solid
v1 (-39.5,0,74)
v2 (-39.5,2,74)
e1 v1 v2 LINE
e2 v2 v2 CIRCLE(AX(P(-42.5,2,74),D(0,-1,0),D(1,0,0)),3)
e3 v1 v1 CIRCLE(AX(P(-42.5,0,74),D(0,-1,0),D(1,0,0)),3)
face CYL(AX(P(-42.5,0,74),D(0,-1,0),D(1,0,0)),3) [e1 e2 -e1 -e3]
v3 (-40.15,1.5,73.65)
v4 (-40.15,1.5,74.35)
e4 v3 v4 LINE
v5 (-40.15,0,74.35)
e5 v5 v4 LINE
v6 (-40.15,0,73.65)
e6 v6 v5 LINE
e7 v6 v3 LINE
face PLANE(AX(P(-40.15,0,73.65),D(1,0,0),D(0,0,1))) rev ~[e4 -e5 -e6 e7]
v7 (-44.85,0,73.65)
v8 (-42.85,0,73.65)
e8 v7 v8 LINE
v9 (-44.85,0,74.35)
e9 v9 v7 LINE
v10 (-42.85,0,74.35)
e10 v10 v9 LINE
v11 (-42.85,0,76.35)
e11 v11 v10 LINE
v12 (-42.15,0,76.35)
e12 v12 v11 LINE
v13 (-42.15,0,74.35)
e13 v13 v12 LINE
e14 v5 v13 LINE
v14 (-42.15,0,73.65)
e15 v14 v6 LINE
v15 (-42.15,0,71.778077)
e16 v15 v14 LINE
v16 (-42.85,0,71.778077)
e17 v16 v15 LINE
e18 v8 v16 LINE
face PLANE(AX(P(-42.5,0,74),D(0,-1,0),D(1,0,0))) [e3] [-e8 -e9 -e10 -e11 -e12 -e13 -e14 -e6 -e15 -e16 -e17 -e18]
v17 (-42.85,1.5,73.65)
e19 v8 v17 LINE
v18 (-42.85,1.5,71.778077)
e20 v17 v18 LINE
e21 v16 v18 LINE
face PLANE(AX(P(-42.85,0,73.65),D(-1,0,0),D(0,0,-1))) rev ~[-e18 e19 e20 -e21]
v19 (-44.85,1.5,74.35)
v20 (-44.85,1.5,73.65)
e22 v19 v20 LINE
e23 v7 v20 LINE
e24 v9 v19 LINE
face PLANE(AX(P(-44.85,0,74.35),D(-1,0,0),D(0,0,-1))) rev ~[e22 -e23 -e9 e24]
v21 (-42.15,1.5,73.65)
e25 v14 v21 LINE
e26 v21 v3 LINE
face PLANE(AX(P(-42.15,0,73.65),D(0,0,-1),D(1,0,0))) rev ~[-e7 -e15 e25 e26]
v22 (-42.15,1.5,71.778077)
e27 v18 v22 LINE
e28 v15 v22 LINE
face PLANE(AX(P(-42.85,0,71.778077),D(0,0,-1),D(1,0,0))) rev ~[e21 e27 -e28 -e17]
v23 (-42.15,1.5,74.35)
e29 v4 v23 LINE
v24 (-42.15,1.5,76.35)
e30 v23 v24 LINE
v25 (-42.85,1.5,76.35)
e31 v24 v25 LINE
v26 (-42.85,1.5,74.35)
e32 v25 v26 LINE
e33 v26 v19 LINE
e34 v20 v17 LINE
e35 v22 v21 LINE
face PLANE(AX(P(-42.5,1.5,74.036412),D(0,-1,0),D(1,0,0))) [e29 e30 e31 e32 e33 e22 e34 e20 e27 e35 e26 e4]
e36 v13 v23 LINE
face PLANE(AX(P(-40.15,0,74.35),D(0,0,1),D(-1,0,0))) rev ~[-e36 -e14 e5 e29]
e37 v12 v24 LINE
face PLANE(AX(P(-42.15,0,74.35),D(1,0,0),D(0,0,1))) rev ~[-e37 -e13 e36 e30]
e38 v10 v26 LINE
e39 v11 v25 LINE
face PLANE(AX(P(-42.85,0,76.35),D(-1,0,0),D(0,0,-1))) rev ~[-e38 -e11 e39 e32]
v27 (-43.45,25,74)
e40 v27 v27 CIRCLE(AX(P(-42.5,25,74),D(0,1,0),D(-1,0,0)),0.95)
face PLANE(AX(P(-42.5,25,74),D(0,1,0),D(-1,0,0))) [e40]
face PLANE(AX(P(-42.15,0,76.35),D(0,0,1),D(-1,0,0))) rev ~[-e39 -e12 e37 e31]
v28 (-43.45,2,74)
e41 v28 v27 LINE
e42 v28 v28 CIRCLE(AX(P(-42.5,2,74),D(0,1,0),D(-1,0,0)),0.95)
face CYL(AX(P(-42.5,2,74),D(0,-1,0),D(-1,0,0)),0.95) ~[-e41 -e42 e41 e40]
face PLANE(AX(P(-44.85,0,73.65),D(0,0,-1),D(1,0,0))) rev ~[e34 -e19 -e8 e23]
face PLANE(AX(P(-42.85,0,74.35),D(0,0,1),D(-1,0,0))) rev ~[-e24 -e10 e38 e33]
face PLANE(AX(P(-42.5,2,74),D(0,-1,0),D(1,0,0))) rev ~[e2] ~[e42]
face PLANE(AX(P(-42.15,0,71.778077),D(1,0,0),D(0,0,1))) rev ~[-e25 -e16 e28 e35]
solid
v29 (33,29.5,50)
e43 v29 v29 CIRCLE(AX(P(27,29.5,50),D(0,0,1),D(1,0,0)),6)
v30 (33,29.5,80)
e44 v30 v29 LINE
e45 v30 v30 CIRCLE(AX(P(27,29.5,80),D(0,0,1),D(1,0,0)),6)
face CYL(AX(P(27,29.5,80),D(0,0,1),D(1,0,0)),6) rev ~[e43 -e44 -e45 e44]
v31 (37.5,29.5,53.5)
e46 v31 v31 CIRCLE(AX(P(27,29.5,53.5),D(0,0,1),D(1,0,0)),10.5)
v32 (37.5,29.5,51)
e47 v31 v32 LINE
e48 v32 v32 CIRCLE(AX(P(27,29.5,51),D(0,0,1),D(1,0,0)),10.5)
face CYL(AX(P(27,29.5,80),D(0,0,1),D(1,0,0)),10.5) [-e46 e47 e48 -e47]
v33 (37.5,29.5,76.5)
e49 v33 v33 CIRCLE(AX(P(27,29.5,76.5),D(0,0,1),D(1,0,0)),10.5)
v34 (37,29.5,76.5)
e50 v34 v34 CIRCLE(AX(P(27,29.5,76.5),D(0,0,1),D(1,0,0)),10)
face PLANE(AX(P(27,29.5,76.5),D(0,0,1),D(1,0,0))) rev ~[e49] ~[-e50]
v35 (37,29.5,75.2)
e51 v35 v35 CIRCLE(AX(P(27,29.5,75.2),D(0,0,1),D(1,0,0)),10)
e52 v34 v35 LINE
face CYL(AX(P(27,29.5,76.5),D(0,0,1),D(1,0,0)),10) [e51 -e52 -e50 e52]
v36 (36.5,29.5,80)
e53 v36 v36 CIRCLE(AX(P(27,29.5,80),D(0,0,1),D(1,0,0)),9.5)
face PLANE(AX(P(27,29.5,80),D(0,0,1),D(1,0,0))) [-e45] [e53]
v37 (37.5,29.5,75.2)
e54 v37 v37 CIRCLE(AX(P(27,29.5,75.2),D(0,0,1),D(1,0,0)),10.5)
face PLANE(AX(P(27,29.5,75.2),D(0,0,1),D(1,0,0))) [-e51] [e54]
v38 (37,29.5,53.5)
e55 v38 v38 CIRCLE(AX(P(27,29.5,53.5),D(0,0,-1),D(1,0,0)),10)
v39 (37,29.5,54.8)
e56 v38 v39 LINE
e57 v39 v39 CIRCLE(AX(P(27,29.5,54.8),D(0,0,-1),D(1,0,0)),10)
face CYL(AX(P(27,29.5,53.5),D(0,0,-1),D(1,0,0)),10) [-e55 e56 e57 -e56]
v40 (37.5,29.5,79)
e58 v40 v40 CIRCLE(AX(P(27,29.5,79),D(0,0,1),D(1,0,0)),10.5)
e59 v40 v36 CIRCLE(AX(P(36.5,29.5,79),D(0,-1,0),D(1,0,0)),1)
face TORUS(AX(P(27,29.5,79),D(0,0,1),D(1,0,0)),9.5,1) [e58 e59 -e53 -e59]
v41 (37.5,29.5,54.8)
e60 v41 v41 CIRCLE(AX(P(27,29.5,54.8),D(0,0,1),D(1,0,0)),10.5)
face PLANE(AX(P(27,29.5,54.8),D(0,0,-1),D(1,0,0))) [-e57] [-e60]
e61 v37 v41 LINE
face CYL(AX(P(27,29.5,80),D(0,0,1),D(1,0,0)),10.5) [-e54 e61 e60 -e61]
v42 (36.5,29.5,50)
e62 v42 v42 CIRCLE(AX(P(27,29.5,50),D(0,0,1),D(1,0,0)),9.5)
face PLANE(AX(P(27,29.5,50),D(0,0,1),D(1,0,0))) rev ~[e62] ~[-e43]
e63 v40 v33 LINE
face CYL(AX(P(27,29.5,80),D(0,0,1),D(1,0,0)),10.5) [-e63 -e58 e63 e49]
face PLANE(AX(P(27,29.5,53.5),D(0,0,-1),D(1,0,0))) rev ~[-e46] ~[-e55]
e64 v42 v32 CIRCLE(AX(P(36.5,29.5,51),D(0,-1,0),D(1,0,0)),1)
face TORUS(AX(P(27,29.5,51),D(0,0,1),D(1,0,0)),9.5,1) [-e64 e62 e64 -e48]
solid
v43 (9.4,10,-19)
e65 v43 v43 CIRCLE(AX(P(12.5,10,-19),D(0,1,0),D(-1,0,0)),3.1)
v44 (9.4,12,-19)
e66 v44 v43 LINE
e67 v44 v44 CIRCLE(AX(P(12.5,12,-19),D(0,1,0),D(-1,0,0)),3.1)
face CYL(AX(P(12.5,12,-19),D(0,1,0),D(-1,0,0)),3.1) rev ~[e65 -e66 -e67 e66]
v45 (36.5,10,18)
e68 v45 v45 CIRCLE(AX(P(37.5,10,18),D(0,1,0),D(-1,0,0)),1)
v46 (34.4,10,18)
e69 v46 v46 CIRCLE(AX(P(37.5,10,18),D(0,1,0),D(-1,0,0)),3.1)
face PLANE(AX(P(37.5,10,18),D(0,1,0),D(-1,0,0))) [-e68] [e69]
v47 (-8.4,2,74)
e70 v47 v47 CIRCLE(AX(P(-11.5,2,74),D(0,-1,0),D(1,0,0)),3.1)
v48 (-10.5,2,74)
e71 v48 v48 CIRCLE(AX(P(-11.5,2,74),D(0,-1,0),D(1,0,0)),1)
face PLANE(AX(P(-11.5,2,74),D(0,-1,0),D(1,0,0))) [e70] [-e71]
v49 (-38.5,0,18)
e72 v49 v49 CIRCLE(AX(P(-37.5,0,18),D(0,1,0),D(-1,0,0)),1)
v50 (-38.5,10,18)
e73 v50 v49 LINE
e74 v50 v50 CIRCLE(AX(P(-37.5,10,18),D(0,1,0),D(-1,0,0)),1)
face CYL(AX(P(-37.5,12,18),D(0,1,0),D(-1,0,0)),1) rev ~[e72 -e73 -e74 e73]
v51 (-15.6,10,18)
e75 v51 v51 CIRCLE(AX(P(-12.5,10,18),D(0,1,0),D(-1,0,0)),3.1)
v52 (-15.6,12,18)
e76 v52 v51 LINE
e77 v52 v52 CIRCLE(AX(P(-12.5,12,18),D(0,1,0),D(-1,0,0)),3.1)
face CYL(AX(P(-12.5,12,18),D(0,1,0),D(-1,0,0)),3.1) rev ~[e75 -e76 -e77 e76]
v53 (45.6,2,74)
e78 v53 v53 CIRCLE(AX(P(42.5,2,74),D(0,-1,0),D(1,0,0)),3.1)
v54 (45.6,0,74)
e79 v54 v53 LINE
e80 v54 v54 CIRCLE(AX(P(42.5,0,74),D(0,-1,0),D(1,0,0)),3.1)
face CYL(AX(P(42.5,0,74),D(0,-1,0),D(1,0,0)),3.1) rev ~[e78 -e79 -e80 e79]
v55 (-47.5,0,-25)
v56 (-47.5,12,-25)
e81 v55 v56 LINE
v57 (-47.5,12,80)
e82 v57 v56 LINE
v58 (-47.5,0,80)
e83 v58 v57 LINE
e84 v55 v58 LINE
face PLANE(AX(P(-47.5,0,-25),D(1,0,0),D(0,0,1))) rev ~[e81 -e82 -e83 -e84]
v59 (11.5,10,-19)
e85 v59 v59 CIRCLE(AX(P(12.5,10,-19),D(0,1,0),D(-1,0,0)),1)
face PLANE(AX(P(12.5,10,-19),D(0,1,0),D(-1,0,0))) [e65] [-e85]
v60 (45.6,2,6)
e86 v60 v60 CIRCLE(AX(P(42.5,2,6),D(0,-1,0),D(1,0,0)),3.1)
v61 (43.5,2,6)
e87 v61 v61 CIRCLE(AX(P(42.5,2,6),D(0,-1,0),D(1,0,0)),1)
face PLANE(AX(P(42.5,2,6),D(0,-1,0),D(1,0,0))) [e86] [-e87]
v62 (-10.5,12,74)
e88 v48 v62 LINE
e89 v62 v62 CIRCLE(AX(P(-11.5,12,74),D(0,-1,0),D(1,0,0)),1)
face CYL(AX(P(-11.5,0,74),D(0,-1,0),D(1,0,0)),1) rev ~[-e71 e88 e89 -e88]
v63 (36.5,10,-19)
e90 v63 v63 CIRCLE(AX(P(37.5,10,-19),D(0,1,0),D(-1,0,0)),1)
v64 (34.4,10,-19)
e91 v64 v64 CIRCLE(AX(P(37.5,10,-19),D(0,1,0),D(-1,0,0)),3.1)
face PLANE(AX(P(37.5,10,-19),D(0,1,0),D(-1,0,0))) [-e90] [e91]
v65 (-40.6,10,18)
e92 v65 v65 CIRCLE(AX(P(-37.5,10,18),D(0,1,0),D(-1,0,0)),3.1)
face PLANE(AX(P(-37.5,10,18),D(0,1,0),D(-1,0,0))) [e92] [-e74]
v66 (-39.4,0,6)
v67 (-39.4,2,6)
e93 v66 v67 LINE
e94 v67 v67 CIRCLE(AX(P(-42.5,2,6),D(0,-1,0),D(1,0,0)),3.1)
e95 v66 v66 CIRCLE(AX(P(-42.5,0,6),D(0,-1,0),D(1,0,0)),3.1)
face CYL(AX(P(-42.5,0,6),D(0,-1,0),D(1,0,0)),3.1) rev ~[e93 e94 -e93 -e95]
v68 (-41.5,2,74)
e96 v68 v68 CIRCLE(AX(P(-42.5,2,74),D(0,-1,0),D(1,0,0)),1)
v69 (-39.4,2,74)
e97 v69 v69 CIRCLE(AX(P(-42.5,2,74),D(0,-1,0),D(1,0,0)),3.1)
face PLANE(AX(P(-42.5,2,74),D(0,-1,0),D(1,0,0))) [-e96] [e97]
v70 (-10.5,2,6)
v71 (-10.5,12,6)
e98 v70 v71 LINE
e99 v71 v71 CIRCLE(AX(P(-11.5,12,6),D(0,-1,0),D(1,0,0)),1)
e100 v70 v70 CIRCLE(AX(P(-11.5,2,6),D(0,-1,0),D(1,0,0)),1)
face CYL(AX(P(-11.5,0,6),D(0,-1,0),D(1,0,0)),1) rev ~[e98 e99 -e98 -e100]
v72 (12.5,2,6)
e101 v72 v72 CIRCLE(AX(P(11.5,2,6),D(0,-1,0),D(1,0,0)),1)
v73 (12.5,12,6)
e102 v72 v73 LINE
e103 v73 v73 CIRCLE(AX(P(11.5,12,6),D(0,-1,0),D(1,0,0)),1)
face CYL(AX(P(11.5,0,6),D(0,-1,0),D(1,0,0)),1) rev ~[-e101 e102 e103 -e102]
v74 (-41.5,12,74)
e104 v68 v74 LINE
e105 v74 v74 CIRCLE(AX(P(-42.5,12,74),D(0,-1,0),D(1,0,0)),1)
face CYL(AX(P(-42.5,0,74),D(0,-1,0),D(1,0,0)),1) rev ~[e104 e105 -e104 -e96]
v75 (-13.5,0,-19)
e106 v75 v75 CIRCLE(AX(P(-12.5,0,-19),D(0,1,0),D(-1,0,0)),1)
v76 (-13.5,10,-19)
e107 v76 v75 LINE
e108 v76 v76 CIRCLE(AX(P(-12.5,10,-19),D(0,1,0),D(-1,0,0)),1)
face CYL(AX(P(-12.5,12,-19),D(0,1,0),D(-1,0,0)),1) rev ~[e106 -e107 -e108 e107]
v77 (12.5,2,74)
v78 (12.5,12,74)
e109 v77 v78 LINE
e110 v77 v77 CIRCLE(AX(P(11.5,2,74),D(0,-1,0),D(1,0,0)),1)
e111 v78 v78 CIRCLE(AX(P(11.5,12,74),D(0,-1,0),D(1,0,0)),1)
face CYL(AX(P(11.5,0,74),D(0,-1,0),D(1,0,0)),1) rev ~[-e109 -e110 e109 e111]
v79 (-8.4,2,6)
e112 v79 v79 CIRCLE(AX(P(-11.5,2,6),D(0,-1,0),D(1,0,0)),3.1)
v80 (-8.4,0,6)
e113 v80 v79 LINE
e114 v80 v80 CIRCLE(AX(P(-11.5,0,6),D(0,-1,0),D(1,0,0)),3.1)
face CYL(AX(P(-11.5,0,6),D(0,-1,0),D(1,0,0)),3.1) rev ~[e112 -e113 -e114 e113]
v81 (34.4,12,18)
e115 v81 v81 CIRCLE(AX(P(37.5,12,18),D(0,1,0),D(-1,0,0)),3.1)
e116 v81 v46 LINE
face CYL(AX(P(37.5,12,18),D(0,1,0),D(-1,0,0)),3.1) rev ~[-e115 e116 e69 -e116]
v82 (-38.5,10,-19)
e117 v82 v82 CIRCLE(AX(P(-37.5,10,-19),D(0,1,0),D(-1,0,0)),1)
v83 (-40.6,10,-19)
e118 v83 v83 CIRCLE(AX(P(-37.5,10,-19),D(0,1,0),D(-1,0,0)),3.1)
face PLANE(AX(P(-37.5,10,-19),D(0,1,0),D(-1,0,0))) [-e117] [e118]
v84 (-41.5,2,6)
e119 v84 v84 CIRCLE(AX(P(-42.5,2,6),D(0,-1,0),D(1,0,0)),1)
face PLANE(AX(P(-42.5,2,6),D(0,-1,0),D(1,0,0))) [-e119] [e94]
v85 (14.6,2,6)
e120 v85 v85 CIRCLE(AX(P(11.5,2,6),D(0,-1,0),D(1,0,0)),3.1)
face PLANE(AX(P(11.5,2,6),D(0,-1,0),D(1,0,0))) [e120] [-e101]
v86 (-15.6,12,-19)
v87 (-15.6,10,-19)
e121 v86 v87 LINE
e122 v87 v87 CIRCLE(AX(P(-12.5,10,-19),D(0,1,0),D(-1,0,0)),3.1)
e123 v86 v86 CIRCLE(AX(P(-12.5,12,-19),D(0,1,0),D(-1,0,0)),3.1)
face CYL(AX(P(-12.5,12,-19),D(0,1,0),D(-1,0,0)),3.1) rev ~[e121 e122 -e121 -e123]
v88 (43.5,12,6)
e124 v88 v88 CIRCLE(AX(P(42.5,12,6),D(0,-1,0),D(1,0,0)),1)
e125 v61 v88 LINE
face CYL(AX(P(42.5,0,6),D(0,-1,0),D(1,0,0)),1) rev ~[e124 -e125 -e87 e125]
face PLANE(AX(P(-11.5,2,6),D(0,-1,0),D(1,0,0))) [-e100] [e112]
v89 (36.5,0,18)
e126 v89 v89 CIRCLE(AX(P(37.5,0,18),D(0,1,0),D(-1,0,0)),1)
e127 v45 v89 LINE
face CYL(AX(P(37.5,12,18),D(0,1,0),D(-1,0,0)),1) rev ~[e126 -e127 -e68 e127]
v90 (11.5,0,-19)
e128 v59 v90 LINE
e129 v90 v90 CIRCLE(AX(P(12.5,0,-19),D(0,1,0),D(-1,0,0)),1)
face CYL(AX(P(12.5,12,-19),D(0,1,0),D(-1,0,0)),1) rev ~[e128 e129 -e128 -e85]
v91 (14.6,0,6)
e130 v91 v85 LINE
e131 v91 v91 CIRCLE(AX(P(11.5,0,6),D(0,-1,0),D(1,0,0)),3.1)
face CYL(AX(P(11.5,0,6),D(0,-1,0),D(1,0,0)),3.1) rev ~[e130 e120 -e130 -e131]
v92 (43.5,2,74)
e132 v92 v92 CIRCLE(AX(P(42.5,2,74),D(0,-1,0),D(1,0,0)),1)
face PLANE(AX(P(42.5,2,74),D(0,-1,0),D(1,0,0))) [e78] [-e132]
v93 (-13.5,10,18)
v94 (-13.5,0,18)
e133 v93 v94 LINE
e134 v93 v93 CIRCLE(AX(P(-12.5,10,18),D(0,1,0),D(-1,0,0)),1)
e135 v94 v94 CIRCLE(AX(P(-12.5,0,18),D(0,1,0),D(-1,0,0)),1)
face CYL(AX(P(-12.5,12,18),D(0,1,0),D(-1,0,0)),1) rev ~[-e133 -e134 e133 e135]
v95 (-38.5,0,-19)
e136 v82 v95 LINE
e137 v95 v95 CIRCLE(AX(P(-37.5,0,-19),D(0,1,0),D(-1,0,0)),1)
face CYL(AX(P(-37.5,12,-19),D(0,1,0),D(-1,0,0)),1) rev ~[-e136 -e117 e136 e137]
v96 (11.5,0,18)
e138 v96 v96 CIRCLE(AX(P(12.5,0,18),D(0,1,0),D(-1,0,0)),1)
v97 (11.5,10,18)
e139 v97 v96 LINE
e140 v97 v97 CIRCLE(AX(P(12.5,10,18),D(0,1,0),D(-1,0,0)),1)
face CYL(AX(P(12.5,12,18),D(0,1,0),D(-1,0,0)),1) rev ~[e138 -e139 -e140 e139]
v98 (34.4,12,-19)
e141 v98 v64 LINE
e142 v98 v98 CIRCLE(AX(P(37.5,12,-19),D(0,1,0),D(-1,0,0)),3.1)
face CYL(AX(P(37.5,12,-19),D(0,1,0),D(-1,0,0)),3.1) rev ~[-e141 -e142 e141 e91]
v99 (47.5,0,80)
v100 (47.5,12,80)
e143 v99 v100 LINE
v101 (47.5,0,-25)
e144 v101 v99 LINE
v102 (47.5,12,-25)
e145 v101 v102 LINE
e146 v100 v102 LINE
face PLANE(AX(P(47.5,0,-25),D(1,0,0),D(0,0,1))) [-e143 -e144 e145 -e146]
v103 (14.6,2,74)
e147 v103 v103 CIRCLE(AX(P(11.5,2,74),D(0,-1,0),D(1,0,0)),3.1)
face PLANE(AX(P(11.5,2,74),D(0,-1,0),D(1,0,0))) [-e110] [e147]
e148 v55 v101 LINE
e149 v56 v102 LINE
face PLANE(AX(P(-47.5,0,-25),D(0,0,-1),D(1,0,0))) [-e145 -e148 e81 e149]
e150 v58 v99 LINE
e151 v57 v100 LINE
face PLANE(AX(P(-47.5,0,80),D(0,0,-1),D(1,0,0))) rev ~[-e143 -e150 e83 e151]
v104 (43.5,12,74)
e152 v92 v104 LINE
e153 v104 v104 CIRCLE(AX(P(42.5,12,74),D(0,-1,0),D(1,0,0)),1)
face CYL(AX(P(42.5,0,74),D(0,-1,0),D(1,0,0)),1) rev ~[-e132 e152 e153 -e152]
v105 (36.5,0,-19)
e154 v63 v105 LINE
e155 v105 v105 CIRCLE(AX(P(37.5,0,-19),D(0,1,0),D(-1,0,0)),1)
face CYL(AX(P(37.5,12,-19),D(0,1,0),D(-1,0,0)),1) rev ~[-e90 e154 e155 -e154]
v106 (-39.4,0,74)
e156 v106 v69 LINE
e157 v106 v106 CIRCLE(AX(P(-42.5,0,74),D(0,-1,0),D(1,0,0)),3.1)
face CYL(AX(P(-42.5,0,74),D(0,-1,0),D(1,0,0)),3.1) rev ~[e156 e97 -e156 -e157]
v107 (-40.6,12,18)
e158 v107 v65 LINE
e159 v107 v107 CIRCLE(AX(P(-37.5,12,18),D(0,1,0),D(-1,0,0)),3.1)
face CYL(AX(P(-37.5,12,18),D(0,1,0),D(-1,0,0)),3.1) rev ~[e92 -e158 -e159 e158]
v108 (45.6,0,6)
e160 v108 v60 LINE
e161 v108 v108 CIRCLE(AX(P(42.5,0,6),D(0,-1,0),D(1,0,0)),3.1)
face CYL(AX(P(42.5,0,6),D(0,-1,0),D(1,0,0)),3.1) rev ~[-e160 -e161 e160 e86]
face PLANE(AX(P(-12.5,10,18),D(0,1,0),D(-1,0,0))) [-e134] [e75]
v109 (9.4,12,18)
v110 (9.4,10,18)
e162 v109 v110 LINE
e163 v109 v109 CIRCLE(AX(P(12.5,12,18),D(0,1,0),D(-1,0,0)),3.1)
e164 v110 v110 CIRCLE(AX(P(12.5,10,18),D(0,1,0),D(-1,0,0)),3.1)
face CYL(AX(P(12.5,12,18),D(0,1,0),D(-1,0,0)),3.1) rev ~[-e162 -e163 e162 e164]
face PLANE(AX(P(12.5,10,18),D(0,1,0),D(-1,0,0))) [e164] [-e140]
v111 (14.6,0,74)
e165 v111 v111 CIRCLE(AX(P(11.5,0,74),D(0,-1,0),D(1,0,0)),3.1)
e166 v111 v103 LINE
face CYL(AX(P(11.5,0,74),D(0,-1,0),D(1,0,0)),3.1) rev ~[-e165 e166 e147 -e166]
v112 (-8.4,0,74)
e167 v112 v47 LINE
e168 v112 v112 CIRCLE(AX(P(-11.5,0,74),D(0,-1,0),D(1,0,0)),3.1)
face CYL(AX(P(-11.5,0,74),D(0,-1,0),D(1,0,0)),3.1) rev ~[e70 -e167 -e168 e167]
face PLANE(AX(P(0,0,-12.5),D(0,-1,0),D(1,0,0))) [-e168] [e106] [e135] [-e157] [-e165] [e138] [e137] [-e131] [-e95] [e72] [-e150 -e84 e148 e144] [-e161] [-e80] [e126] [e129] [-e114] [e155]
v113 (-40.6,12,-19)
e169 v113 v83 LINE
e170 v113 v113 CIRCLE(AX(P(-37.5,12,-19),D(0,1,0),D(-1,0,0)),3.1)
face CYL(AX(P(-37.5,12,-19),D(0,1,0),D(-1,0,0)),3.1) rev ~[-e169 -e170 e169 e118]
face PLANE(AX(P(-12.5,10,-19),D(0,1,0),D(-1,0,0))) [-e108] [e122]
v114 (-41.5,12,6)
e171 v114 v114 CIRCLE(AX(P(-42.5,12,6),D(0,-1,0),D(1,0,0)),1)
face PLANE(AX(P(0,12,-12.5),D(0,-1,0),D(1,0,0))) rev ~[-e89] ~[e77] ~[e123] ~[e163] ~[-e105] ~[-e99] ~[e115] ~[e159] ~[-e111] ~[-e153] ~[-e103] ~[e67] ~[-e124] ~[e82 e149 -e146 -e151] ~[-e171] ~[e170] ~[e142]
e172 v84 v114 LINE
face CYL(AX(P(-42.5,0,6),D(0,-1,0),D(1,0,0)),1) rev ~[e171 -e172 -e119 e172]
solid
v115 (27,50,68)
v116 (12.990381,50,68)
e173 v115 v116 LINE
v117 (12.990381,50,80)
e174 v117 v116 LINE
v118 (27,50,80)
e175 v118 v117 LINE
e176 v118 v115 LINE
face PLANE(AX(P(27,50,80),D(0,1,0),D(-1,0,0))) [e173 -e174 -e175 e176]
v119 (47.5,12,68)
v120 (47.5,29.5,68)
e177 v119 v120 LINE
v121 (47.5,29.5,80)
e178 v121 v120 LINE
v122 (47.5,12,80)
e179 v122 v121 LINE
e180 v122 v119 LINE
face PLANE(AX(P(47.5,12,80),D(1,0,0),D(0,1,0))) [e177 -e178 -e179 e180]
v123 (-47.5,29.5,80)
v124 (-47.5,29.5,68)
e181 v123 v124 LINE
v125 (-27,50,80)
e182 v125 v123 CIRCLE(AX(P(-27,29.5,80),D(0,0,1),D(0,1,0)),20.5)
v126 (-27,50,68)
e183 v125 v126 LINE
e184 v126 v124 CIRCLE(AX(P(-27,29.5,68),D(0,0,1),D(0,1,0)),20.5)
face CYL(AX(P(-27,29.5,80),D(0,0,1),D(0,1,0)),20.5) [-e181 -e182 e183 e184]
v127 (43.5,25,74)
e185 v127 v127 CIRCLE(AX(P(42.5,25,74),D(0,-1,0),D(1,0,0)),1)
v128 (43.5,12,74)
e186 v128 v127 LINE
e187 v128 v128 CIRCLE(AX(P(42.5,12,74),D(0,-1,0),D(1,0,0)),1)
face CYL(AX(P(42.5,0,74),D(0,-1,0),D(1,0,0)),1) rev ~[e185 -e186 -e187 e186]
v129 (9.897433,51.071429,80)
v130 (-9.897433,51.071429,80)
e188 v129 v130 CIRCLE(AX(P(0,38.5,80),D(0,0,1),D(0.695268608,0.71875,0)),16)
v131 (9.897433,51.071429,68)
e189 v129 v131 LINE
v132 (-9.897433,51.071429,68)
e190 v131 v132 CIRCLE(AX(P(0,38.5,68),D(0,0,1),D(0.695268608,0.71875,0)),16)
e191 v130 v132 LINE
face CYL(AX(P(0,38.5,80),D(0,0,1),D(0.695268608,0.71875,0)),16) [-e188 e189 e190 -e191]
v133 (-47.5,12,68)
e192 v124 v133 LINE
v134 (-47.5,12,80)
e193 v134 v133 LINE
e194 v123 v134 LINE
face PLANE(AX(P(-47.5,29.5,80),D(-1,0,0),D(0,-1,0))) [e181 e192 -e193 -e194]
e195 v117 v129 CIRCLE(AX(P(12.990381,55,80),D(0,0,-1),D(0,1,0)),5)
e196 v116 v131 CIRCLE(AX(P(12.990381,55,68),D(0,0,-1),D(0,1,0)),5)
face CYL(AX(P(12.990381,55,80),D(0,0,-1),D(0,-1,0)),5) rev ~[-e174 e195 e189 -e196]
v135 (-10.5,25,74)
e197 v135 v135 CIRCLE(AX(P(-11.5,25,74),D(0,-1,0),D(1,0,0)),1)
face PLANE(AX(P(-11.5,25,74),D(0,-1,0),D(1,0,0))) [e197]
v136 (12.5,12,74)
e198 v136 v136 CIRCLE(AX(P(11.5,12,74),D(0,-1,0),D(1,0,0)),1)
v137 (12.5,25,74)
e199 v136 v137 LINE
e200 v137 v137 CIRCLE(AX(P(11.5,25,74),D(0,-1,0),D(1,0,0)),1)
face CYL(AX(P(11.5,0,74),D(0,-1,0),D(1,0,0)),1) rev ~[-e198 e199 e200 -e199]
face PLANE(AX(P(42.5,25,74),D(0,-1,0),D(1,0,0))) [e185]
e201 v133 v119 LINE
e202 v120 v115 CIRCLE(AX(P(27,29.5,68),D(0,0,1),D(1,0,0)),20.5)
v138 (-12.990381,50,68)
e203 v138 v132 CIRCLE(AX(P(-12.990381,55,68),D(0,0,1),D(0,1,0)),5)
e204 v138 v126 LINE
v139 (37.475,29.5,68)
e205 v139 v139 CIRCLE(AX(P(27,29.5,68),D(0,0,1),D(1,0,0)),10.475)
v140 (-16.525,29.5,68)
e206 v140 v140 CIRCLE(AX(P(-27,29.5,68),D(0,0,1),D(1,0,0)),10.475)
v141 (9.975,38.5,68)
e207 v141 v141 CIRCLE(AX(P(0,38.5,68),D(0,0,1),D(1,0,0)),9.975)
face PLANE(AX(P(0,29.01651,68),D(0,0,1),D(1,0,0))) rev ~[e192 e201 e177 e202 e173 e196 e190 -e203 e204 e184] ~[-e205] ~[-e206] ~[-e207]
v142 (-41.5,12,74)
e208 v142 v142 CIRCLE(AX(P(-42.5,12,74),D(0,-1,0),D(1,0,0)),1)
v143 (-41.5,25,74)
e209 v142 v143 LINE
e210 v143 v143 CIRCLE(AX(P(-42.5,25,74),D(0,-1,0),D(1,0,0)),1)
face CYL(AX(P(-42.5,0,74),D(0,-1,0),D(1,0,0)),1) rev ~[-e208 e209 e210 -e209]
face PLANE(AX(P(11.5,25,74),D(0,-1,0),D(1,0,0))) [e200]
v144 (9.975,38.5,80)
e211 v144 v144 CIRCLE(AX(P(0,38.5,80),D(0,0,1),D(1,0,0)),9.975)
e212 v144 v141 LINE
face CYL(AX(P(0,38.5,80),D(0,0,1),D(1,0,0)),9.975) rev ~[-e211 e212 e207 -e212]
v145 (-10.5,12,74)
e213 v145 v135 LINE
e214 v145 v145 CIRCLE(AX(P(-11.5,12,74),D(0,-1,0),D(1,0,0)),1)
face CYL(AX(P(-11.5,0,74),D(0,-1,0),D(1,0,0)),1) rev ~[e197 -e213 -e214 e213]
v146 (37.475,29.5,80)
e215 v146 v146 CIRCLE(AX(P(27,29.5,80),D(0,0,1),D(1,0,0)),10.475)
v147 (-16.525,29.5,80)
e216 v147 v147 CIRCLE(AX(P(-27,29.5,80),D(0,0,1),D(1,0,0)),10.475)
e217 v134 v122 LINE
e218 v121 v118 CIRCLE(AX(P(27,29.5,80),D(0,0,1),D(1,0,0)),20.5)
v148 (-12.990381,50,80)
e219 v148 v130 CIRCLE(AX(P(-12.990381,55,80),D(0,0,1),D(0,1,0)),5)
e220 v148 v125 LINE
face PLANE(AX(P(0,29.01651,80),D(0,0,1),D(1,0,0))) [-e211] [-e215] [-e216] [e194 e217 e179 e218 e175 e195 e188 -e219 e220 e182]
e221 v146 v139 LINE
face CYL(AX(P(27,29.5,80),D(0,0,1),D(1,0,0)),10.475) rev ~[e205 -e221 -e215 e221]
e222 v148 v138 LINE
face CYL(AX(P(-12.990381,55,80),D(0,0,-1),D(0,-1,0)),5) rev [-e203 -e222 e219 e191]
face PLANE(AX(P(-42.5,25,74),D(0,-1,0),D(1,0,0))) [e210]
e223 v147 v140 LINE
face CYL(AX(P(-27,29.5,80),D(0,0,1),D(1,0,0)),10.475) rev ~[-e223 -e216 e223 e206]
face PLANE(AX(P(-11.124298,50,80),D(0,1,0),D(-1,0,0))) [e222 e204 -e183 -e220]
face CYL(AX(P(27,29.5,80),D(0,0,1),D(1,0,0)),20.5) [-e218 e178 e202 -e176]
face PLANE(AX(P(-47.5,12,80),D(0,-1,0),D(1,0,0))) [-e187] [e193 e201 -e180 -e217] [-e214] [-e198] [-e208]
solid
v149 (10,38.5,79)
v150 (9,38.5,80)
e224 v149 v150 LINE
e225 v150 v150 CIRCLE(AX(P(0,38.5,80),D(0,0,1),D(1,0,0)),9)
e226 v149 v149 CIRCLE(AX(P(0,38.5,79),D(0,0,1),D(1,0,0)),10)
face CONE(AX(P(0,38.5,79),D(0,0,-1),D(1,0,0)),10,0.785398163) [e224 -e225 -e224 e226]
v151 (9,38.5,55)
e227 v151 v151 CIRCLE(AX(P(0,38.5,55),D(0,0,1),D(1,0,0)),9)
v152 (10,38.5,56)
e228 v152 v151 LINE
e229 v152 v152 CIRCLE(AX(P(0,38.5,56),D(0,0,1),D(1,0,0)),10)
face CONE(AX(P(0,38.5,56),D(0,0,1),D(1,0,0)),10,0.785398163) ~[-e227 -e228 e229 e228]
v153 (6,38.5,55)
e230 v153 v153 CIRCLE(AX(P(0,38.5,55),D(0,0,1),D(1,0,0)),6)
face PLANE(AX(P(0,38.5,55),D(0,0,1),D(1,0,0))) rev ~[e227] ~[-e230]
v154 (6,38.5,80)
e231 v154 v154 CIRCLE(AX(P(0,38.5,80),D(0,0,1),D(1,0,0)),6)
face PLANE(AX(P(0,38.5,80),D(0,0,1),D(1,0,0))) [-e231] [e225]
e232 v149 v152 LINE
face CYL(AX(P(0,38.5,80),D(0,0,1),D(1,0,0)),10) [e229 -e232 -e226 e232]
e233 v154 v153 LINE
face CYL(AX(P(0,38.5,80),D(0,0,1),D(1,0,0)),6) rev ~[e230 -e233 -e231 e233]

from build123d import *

# Parameters (mm, degrees)
F0_W      = 95
F0_H      = 80
F1_DEPTH  = 12
F2_R      = 10.475
F3_DEPTH  = 12
F4_R      = 9.975
F5_DEPTH  = 25
F6_R      = 10.5
F6_R_2    = 6
F7_DEPTH  = 30
F9_START  = -3.5
F8_R      = 13.9480454754
F8_R_2    = 10
F9_DEPTH  = 1.3
F11_START = -3.5
F10_R     = 14.6955703702
F10_R_2   = 10
F11_DEPTH = 1.3
F12_R     = 1
F13_R     = 1
F14_DEPTH = 25
F15_R     = 3.1
F16_DEPTH = 2
F17_R     = 3
F18_DEPTH = 2
F19_R     = 0.95
F20_DEPTH = 23
F22_DEPTH = 1.5
F23_W     = 95
F23_H     = 25
F24_DEPTH = 12
F25_R     = 1
F26_DEPTH = 25
F27_R     = 3.1
F28_DEPTH = 2
F29_R     = 10
F29_R_2   = 6
F30_DEPTH = 25
F31_SIZE  = 1
F32_R     = 5


with BuildPart() as f1:
    # F0 (on Front) → F1 (new body)
    with BuildSketch(Plane.XZ):
        with Locations((0, 40)):
            Rectangle(F0_W, F0_H)
    extrude(amount=-F1_DEPTH)


with BuildPart() as f3:
    # F2 (on face) → F3 (new body)
    with BuildSketch(Plane.XY.offset(80)):
        with BuildLine():
            Line((-47.5, 12), (47.5, 12))
            Line((47.5, 12), (47.5, 29.5))
            ThreePointArc((47.5, 29.5), (41.4956890143, 43.9956890143), (27, 50))
            Line((27, 50), (11.1242977306, 50))
            ThreePointArc((11.1242977306, 50), (14.7307291688, 44.7454477946), (16, 38.5))
            ThreePointArc((16, 38.5), (-6.2454477946, 23.7692708312), (-11.1242977306, 50))
            Line((-11.1242977306, 50), (-27, 50))
            ThreePointArc((-27, 50), (-41.4956890143, 43.9956890143), (-47.5, 29.5))
            Line((-47.5, 29.5), (-47.5, 12))
        make_face()
        with Locations((-27, 29.5)):
            Circle(F2_R, mode=Mode.SUBTRACT)
        with Locations((27, 29.5)):
            Circle(F2_R, mode=Mode.SUBTRACT)
        with BuildLine():
            ThreePointArc((16, 38.5), (14.7307291688, 44.7454477946), (11.1242977306, 50))
            Line((11.1242977306, 50), (-11.1242977306, 50))
            ThreePointArc((-11.1242977306, 50), (-6.2454477946, 23.7692708312), (16, 38.5))
        make_face()
        with BuildLine():
            Line((-11.1242977306, 50), (11.1242977306, 50))
            ThreePointArc((11.1242977306, 50), (0, 54.5), (-11.1242977306, 50))
        make_face()
    extrude(amount=-F3_DEPTH)

    # F4 (on face) → F5 (cut)
    with BuildSketch(Plane.XY.offset(80)):
        with Locations((0, 38.5)):
            Circle(F4_R)
    extrude(amount=-F5_DEPTH, mode=Mode.SUBTRACT)


with BuildPart() as f7:
    # F6 (on face) → F7 (new body)
    with BuildSketch(Plane.XY.offset(80)):
        with Locations((27, 29.5)):
            Circle(F6_R)
        with Locations((27, 29.5)):
            Circle(F6_R_2, mode=Mode.SUBTRACT)
    extrude(amount=-F7_DEPTH)

    # F8 (on face) → F9 (cut)
    with BuildSketch(Plane.XY.offset(80).offset(F9_START)):
        with Locations((27, 29.5)):
            Circle(F8_R)
        with Locations((27, 29.5)):
            Circle(F8_R_2, mode=Mode.SUBTRACT)
    extrude(amount=-F9_DEPTH, mode=Mode.SUBTRACT)

    # F10 (on face) → F11 (cut)
    with BuildSketch(Plane(origin=(0, 0, 50), x_dir=(1, 0, 0), z_dir=(0, 0, -1)).offset(F11_START)):
        with Locations((27, -29.5)):
            Circle(F10_R)
        with Locations((27, -29.5)):
            Circle(F10_R_2, mode=Mode.SUBTRACT)
    extrude(amount=-F11_DEPTH, mode=Mode.SUBTRACT)

    # F12
    f12_edges = [f7.edges().sort_by_distance(p)[0] for p in [
        (16.5, 29.5, 80),
        (16.5, 29.5, 50),
    ]]
    fillet(f12_edges, radius=F12_R)


with BuildPart() as f14_tool:
    # F13 (on face) → F14 (new body)
    with BuildSketch(Plane.XZ):
        with Locations((-42.5, 74)):
            Circle(F13_R)
        with Locations((-11.5, 74)):
            Circle(F13_R)
        with Locations((11.5, 74)):
            Circle(F13_R)
        with Locations((42.5, 74)):
            Circle(F13_R)
        with Locations((-42.5, 6)):
            Circle(F13_R)
        with Locations((-11.5, 6)):
            Circle(F13_R)
        with Locations((11.5, 6)):
            Circle(F13_R)
        with Locations((42.5, 6)):
            Circle(F13_R)
    extrude(amount=-F14_DEPTH)


with BuildPart() as f1_1:
    add(f1.part)

    # F14: cut by f14_tool
    add(f14_tool.part, mode=Mode.SUBTRACT)

    # F15 (on face) → F16 (cut)
    with BuildSketch(Plane.XZ):
        with Locations((-42.5, 74)):
            Circle(F15_R)
        with Locations((-11.5, 74)):
            Circle(F15_R)
        with Locations((11.5, 74)):
            Circle(F15_R)
        with Locations((42.5, 74)):
            Circle(F15_R)
        with Locations((-42.5, 6)):
            Circle(F15_R)
        with Locations((-11.5, 6)):
            Circle(F15_R)
        with Locations((11.5, 6)):
            Circle(F15_R)
        with Locations((42.5, 6)):
            Circle(F15_R)
    extrude(amount=-F16_DEPTH, mode=Mode.SUBTRACT)

    # F23 (on face) → F24 (join)
    with BuildSketch(Plane.XZ):
        with Locations((0, -12.5)):
            Rectangle(F23_W, F23_H)
    extrude(amount=-F24_DEPTH)

    # F25 (on face) → F26 (cut)
    with BuildSketch(Plane(origin=(0, 12, 0), x_dir=(-1, 0, 0), z_dir=(0, 1, 0))):
        with Locations((-37.5, -19)):
            Circle(F25_R)
        with Locations((-37.5, 18)):
            Circle(F25_R)
        with Locations((-12.5, -19)):
            Circle(F25_R)
        with Locations((-12.5, 18)):
            Circle(F25_R)
        with Locations((12.5, -19)):
            Circle(F25_R)
        with Locations((12.5, 18)):
            Circle(F25_R)
        with Locations((37.5, -19)):
            Circle(F25_R)
        with Locations((37.5, 18)):
            Circle(F25_R)
    extrude(amount=-F26_DEPTH, mode=Mode.SUBTRACT)

    # F27 (on face) → F28 (cut)
    with BuildSketch(Plane(origin=(0, 12, 0), x_dir=(-1, 0, 0), z_dir=(0, 1, 0))):
        with Locations((-37.5, 18)):
            Circle(F27_R)
        with Locations((-37.5, -19)):
            Circle(F27_R)
        with Locations((-12.5, 18)):
            Circle(F27_R)
        with Locations((-12.5, -19)):
            Circle(F27_R)
        with Locations((12.5, 18)):
            Circle(F27_R)
        with Locations((12.5, -19)):
            Circle(F27_R)
        with Locations((37.5, 18)):
            Circle(F27_R)
        with Locations((37.5, -19)):
            Circle(F27_R)
    extrude(amount=-F28_DEPTH, mode=Mode.SUBTRACT)


with BuildPart() as f3_1:
    add(f3.part)

    # F14: cut by f14_tool
    add(f14_tool.part, mode=Mode.SUBTRACT)

    # F32
    f32_edges = [f3_1.edges().sort_by_distance(p)[0] for p in [
        (11.124298, 50, 74),
        (-11.124298, 50, 74),
    ]]
    fillet(f32_edges, radius=F32_R)


with BuildPart() as f18:
    # F17 (on face) → F18 (new body)
    with BuildSketch(Plane.XZ):
        with Locations((-42.5, 74)):
            Circle(F17_R)
    extrude(amount=-F18_DEPTH)

    # F19 (on face) → F20 (join)
    with BuildSketch(Plane(origin=(0, 2, 0), x_dir=(-1, 0, 0), z_dir=(0, 1, 0))):
        with Locations((42.5, 74)):
            Circle(F19_R)
    extrude(amount=F20_DEPTH)

    # F21 (on face) → F22 (cut)
    with BuildSketch(Plane.XZ):
        Polygon((-40.15, 73.65), (-40.15, 74.35), (-42.15, 74.35), (-42.15, 76.35), (-42.85, 76.35), (-42.85, 74.35), (-44.85, 74.35), (-44.85, 73.65), (-42.85, 73.65), (-42.85, 71.7780768571), (-42.15, 71.7780768571), (-42.15, 73.65), align=None)
    extrude(amount=-F22_DEPTH, mode=Mode.SUBTRACT)


with BuildPart() as f30:
    # F29 (on face) → F30 (new body)
    with BuildSketch(Plane.XY.offset(80)):
        with Locations((0, 38.5)):
            Circle(F29_R)
        with Locations((0, 38.5)):
            Circle(F29_R_2, mode=Mode.SUBTRACT)
    extrude(amount=-F30_DEPTH)

    # F31
    f31_edges = [f30.edges().sort_by_distance(p)[0] for p in [
        (-10, 38.5, 55),
        (-10, 38.5, 80),
    ]]
    chamfer(f31_edges, length=F31_SIZE)


solid = Compound([f7.part, f1_1.part, f3_1.part, f18.part, f30.part])
